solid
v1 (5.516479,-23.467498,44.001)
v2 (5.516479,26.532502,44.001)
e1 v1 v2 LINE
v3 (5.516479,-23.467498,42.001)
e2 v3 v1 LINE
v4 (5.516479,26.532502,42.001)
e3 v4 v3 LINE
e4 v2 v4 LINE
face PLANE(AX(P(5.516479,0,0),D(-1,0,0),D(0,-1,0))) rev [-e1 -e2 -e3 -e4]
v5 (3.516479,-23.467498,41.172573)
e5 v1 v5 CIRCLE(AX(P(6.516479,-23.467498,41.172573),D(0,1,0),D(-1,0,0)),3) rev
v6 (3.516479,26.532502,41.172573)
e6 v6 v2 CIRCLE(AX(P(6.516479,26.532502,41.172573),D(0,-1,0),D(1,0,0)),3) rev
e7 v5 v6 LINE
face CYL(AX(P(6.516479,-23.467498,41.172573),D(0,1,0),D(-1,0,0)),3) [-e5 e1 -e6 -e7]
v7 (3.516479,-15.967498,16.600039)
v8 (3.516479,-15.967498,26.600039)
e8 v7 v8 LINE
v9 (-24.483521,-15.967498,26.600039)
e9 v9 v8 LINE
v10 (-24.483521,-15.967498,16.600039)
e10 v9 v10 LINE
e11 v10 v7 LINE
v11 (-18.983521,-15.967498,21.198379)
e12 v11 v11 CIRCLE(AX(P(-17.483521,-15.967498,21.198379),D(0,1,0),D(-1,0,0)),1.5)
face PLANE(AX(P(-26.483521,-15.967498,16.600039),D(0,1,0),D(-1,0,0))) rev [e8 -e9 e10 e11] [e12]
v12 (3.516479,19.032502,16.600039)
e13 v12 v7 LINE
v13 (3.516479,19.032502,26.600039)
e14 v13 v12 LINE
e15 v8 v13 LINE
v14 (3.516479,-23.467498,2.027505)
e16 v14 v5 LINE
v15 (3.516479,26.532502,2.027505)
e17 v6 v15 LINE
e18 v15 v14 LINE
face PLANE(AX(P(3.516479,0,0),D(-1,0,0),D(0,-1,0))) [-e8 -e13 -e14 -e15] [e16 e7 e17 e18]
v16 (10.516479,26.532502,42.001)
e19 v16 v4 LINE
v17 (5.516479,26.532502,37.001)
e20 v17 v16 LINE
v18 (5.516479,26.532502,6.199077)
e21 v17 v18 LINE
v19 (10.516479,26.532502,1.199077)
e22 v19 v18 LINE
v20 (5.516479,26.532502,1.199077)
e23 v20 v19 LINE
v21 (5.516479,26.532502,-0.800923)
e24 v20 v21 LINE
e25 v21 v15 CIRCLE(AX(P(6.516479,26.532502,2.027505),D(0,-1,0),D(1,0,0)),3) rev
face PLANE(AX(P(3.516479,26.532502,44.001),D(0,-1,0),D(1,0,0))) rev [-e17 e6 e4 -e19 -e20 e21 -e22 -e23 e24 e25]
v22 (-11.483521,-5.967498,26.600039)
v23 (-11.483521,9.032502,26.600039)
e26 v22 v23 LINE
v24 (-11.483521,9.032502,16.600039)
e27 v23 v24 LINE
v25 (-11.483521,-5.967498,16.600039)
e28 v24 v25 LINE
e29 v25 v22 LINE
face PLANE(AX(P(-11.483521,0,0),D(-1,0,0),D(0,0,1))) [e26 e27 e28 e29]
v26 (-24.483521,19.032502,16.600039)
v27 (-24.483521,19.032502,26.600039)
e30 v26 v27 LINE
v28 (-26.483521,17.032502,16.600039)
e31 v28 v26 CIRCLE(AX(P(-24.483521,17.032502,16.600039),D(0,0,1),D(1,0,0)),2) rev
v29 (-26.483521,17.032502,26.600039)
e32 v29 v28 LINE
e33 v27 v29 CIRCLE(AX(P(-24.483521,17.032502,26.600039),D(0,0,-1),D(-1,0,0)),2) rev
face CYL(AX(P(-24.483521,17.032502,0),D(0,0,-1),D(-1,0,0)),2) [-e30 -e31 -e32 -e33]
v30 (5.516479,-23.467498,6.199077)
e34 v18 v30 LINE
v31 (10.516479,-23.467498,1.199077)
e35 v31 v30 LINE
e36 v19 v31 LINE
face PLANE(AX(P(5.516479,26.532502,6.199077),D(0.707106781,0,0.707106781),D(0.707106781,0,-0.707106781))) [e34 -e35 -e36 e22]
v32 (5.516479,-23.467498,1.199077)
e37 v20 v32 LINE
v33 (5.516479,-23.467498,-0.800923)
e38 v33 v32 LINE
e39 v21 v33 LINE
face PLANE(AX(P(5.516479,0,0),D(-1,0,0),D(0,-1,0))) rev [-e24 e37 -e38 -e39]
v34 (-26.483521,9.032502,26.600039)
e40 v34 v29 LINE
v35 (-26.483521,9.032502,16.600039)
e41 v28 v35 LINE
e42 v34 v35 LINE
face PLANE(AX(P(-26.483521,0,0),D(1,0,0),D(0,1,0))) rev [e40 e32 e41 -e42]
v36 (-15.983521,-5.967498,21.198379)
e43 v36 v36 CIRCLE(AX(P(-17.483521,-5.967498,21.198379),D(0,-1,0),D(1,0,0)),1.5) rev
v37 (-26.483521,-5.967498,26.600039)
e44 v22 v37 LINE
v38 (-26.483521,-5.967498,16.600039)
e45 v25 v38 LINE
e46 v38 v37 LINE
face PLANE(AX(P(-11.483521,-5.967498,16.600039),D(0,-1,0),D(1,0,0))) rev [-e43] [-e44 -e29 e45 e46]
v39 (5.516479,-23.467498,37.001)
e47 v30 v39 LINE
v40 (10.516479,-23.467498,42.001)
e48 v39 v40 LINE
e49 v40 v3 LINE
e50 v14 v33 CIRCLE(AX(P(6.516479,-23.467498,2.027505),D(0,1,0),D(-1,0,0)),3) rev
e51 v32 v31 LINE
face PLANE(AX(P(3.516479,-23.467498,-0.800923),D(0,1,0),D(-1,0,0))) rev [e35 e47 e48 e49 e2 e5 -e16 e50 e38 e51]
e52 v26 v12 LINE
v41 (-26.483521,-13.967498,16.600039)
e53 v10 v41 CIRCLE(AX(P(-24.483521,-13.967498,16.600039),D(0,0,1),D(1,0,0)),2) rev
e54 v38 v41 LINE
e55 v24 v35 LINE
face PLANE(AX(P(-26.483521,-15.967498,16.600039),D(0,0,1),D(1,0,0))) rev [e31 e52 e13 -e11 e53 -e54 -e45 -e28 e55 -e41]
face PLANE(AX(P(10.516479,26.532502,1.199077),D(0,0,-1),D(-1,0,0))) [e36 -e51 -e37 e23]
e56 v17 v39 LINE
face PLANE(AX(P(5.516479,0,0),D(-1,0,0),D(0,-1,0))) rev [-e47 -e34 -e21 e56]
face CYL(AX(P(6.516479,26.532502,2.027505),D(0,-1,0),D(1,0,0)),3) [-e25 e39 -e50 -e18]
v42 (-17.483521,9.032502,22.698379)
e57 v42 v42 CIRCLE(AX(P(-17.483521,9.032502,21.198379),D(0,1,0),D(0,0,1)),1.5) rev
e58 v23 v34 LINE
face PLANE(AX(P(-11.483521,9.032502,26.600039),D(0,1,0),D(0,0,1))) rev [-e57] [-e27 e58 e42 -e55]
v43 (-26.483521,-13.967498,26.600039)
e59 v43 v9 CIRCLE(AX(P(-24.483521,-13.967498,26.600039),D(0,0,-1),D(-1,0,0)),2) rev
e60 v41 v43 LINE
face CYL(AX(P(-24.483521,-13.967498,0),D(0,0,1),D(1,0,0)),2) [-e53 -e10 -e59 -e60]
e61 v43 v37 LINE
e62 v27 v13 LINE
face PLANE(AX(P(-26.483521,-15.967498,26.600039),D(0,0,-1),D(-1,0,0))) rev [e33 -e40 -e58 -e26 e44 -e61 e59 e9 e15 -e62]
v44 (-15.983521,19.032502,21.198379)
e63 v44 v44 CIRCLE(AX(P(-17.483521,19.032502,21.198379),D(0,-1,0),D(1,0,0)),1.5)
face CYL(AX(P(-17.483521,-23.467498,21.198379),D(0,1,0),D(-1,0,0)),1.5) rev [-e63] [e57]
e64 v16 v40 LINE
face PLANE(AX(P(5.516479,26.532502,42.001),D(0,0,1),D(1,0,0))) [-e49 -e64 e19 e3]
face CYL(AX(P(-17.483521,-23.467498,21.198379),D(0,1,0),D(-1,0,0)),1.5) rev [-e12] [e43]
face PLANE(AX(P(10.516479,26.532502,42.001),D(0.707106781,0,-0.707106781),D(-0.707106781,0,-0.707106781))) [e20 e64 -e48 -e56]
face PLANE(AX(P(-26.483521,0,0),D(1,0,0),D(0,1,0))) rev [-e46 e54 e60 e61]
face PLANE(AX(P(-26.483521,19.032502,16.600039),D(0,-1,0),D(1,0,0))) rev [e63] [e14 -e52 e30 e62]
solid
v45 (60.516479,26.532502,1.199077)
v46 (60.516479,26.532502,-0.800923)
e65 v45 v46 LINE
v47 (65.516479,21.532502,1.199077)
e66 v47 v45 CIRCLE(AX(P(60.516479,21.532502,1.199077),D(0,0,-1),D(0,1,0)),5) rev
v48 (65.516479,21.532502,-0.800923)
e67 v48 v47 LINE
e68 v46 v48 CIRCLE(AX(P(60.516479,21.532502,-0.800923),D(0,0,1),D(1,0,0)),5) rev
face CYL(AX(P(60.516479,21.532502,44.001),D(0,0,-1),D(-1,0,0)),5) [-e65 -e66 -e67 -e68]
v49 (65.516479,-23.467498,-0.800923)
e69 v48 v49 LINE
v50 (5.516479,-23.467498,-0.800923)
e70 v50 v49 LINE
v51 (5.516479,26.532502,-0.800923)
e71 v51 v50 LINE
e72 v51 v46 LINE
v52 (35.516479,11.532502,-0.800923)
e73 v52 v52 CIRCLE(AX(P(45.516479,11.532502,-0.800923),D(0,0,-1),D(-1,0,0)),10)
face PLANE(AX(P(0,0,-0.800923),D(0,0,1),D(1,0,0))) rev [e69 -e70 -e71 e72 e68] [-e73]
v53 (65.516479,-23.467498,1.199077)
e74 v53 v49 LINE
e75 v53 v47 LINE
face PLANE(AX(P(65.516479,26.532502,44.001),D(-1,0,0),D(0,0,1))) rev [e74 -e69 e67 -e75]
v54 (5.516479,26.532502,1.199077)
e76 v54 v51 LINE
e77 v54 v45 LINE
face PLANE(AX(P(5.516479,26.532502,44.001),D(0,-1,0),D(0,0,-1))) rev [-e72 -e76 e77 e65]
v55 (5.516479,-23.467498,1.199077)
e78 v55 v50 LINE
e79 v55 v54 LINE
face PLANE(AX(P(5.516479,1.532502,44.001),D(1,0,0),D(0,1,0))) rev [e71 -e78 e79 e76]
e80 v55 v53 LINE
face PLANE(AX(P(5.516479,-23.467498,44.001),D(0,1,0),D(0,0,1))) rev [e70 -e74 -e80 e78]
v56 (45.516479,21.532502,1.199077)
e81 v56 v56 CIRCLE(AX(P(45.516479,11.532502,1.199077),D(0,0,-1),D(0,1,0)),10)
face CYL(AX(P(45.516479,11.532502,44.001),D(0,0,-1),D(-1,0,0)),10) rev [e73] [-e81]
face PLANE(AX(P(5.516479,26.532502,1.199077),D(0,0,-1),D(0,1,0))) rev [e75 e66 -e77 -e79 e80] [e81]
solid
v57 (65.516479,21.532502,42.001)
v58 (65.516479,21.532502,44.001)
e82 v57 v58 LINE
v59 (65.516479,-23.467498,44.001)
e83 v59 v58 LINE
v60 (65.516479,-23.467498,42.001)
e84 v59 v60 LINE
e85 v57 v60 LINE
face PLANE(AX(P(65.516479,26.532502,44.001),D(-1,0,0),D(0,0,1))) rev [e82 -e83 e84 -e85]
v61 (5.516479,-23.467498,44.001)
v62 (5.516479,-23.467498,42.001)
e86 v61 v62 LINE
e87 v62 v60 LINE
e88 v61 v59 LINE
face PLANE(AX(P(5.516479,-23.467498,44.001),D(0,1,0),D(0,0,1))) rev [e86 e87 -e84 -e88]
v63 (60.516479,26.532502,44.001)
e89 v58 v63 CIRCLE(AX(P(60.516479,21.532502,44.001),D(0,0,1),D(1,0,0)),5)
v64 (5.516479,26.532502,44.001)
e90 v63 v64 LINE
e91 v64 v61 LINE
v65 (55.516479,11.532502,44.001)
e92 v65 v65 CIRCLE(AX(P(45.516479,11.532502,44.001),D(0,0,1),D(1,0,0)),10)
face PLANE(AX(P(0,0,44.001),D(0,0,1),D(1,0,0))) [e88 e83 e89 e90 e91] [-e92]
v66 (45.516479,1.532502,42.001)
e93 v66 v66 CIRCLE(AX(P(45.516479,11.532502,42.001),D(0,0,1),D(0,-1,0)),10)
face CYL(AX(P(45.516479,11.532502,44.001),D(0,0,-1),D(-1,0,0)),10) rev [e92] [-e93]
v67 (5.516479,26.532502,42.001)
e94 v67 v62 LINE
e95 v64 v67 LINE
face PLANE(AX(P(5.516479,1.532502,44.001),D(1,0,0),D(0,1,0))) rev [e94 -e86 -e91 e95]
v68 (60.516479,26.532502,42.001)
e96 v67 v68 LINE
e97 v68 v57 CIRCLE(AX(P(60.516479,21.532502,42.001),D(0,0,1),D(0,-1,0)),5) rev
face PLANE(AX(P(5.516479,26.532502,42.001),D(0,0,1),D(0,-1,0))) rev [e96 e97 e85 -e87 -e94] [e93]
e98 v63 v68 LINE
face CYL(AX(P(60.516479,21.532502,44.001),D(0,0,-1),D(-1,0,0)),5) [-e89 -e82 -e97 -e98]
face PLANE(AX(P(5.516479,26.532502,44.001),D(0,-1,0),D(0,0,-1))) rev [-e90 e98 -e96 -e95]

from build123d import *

# Parameters (mm, degrees)
SKETCH_3_R               = 3
EXTRUDE_6_DEPTH          = 0.001
EXTRUDE_6_2_DEPTH        = 0.001
EXTRUDE_6_3_DEPTH        = 0.001
EXTRUDE_6_4_DEPTH        = 0.001
CUT_EXTRUDE_2_DEPTH      = 67.213034483
CUT_EXTRUDE_2_DEPTH_BACK = 67.213034483
SKETCH_11_R              = 2.25
EXTRUDE_7_DEPTH          = 2
EXTRUDE_7_DEPTH_BACK     = 0.801922547
SKETCH_14_R              = 10
CUT_EXTRUDE_3_DEPTH      = 3
SKETCH_12_4_R            = 10
EXTRUDE_10_DEPTH         = 44
SKETCH_20_W              = 40.801922547
SKETCH_20_H              = 50
CUT_EXTRUDE_6_DEPTH      = 60
SKETCH_21_W              = 44.801922547
SKETCH_21_H              = 50
EXTRUDE_11_DEPTH         = 2
FILLET_2_R               = 5
FILLET_3_R               = 5
FILLET_5_R               = 3
FILLET_6_R               = 3
EXTRUDE_15_DEPTH         = 50
SKETCH_36_W              = 10
SKETCH_36_H              = 35
EXTRUDE_16_DEPTH         = 30
FILLET_7_R               = 2
CUT_EXTRUDE_8_DEPTH      = 90.636750061
CUT_EXTRUDE_8_DEPTH_BACK = 90.636750061
SKETCH_39_R              = 1.5
SKETCH_38_W              = 10
SKETCH_38_H              = 15
CUT_EXTRUDE_9_DEPTH      = 15


with BuildPart() as part:
    # 草图3 → 凸台-拉伸6 (new body)
    with BuildSketch(Plane.XY):
        with Locations((60.266478541, 16.532501821)):
            Circle(SKETCH_3_R)
    extrude(amount=EXTRUDE_6_DEPTH)


with BuildPart() as body_2:
    # 草图3 → Extrude 6 2 (new body)
    with BuildSketch(Plane.XY):
        with Locations((60.266478541, 6.532501821)):
            Circle(SKETCH_3_R)
    extrude(amount=EXTRUDE_6_2_DEPTH)


with BuildPart() as body_3:
    # 草图3 → Extrude 6 3 (new body)
    with BuildSketch(Plane.XY):
        with Locations((10.766478541, 6.532501821)):
            Circle(SKETCH_3_R)
    extrude(amount=EXTRUDE_6_3_DEPTH)


with BuildPart() as body_4:
    # 草图3 → Extrude 6 4 (new body)
    with BuildSketch(Plane.XY):
        with Locations((10.766478541, 16.532501821)):
            Circle(SKETCH_3_R)
    extrude(amount=EXTRUDE_6_4_DEPTH)


with BuildPart() as cut_extrude_2_tool:
    # 草图11 → 切除-拉伸2 (new, two sides: drawn at the far end of the back side and taken through both)
    with BuildSketch(Plane.XY.offset(0.001).offset(-CUT_EXTRUDE_2_DEPTH_BACK)):
        with Locations((10.766478541, 16.532501821)):
            Circle(SKETCH_11_R)
        with Locations((10.766478541, 6.532501821)):
            Circle(SKETCH_11_R)
        with Locations((60.266478541, 16.532501821)):
            Circle(SKETCH_11_R)
        with Locations((60.266478541, 6.532501821)):
            Circle(SKETCH_11_R)
    extrude(amount=CUT_EXTRUDE_2_DEPTH + CUT_EXTRUDE_2_DEPTH_BACK)


with BuildPart() as part_1:
    add(part.part)

    # 切除-拉伸2: cut by cut_extrude_2_tool
    add(cut_extrude_2_tool.part, mode=Mode.SUBTRACT)



with BuildPart() as body_2_1:
    add(body_2.part)

    # 切除-拉伸2: cut by cut_extrude_2_tool
    add(cut_extrude_2_tool.part, mode=Mode.SUBTRACT)


with BuildPart() as body_3_1:
    add(body_3.part)

    # 切除-拉伸2: cut by cut_extrude_2_tool
    add(cut_extrude_2_tool.part, mode=Mode.SUBTRACT)


with BuildPart() as body_4_1:
    add(body_4.part)

    # 切除-拉伸2: cut by cut_extrude_2_tool
    add(cut_extrude_2_tool.part, mode=Mode.SUBTRACT)


with BuildPart() as body_5:
    # 草图12 → 凸台-拉伸7 (new, two sides: drawn at the far end of the back side and taken through both)
    with BuildSketch(Plane.XY.offset(0.001).offset(-EXTRUDE_7_DEPTH_BACK)):
        Polygon((5.516478541, 26.532501821), (65.516478541, 26.532501821), (65.516478541, -23.467498179), (5.516478541, -23.467498179), (5.516478541, 1.532501821), align=None)
    extrude(amount=EXTRUDE_7_DEPTH + EXTRUDE_7_DEPTH_BACK)

    # 草图14 → 切除-拉伸3 (cut)
    with BuildSketch(Plane(origin=(0, 0, -0.800922547), x_dir=(-1, 0, 0), z_dir=(0, 0, -1))):
        with Locations((-45.516478541, 11.532501821)):
            Circle(SKETCH_14_R)
    extrude(amount=-CUT_EXTRUDE_3_DEPTH, mode=Mode.SUBTRACT)


with BuildPart() as part_2:
    add(part_1.part)

    add(body_2_1.part)  # 凸台-拉伸10 merges body 2

    add(body_3_1.part)  # 凸台-拉伸10 merges body 3

    add(body_4_1.part)  # 凸台-拉伸10 merges body 4

    add(body_5.part)  # 凸台-拉伸10 merges body 5
    # 草图12<4> → 凸台-拉伸10 (add)
    with BuildSketch(Plane.XY.offset(0.001)):
        Polygon((5.516478541, 26.532501821), (65.516478541, 26.532501821), (65.516478541, -23.467498179), (5.516478541, -23.467498179), (5.516478541, 1.532501821), align=None)
        with Locations(Location((45.516478541, 11.532501821, 0), (0, 0, 180))):
            Circle(SKETCH_12_4_R, mode=Mode.SUBTRACT)
    extrude(amount=EXTRUDE_10_DEPTH)

    # 草图20 → 切除-拉伸6 (cut)
    with BuildSketch(Plane(origin=(65.516478541, 0, 0), x_dir=(0, 0, -1), z_dir=(1, 0, 0))):
        with Locations((-21.600038727, 1.532501821)):
            Rectangle(SKETCH_20_W, SKETCH_20_H)
    extrude(amount=-CUT_EXTRUDE_6_DEPTH, mode=Mode.SUBTRACT)


with BuildPart() as cut_extrude_6_piece_1:
    # of the separate pieces the step leaves, piece 1, a body of its own (cut_extrude_6_pieces)
    add(part_2.part.solids().sort_by_distance((5.516478541, 26.532501821, 42.001))[0])

    # 圆角3
    fillet_3_edges = [cut_extrude_6_piece_1.edges().sort_by_distance(p)[0] for p in [
        (65.516478541, 26.532501821, 43.001),
    ]]
    fillet(fillet_3_edges, radius=FILLET_3_R)


with BuildPart() as cut_extrude_6_piece_2:
    # of the separate pieces the step leaves, piece 2, a body of its own (cut_extrude_6_pieces)
    add(part_2.part.solids().sort_by_distance((5.516478541, 26.532501821, -0.800922547))[0])

    # 圆角2
    fillet_2_edges = [cut_extrude_6_piece_2.edges().sort_by_distance(p)[0] for p in [
        (65.516478541, 26.532501821, 0.199077453),
    ]]
    fillet(fillet_2_edges, radius=FILLET_2_R)


with BuildPart() as body_3_2:
    # 草图21 → 凸台-拉伸11 (new body)
    with BuildSketch(Plane.ZY.offset(-5.516478541)):
        with Locations((21.600038727, 1.532501821)):
            Rectangle(SKETCH_21_W, SKETCH_21_H)
    extrude(amount=EXTRUDE_11_DEPTH)

    # 圆角5
    # the kernel refuses this fillet: 3 mm, written as the material it takes off along each edge
    with BuildSketch(Plane(origin=(3.516478541, -30.538565991, 44.001), x_dir=(1, 0, 0), z_dir=(0, 1, 0))) as fillet_5_piece_1:
        with BuildLine():
            CenterArc((3, 2.828427125), FILLET_5_R, 180, 70.528779366)
            Line((0, 2.828427125), (-0.06, 2.828427125))
            Line((-0.06, 2.828427125), (-0.06, 0))
            Line((-0.06, 0), (0, -0.06))
            ThreePointArc((0, -0.06), (1, -0.06), (1.98, -0.056568542))
            Line((1.98, -0.056568542), (2, 0))
        make_face()
    extrude(amount=64.142135624, mode=Mode.SUBTRACT)

    # 圆角6
    # the kernel refuses this fillet: 3 mm, written as the material it takes off along each edge
    with BuildSketch(Plane(origin=(3.516478541, 33.603569633, -0.800922547), x_dir=(0, 0, 1), z_dir=(0, -1, 0))) as fillet_6_piece_1:
        with BuildLine():
            CenterArc((2.828427125, -3), FILLET_6_R, 90, 70.528779366)
            Line((0, -2), (-0.056568542, -1.98))
            ThreePointArc((-0.056568542, -1.98), (-0.06, -1), (-0.06, 0))
            Line((-0.06, 0), (0, 0.06))
            Line((0, 0.06), (2.828427125, 0.06))
            Line((2.828427125, 0.06), (2.828427125, 0))
        make_face()
    extrude(amount=64.142135624, mode=Mode.SUBTRACT)

    # 草图35 → 凸台-拉伸15 (add)
    with BuildSketch(Plane.XZ.offset(23.467498179)):
        Polygon((5.516478541, 42.001), (10.516478541, 42.001), (5.516478541, 37.001), align=None)
        Polygon((5.516478541, 1.199077453), (5.516478541, 6.199077453), (10.516478541, 1.199077453), align=None)
    extrude(amount=-EXTRUDE_15_DEPTH)

    # 草图36 → 凸台-拉伸16 (add)
    with BuildSketch(Plane.ZY.offset(-3.516478541)):
        with Locations((21.600038726, 1.532501821)):
            Rectangle(SKETCH_36_W, SKETCH_36_H)
    extrude(amount=EXTRUDE_16_DEPTH)

    # 圆角7
    fillet_7_edges = [body_3_2.edges().sort_by_distance(p)[0] for p in [
        (-26.483521459, 19.032501821, 21.600038726),
        (-26.483521459, -15.967498179, 21.600038726),
    ]]
    fillet(fillet_7_edges, radius=FILLET_7_R)

    # 草图39 → 切除-拉伸8 (cut, two sides: drawn at the far end of the back side and taken through both)
    with BuildSketch(Plane(origin=(0, 19.032501821, 0), x_dir=(1, 0, 0), z_dir=(0, 1, 0)).offset(-CUT_EXTRUDE_8_DEPTH_BACK)):
        with Locations(Location((-17.483521459, -21.198379325, 0), (0, 0, 180))):
            Circle(SKETCH_39_R)
    extrude(amount=CUT_EXTRUDE_8_DEPTH + CUT_EXTRUDE_8_DEPTH_BACK, mode=Mode.SUBTRACT)

    # 草图38 → 切除-拉伸9 (cut)
    with BuildSketch(Plane.ZY.offset(26.483521459)):
        with Locations((21.600038726, 1.532501821)):
            Rectangle(SKETCH_38_W, SKETCH_38_H)
    extrude(amount=-CUT_EXTRUDE_9_DEPTH, mode=Mode.SUBTRACT)


solid = Compound([cut_extrude_6_piece_1.part, cut_extrude_6_piece_2.part, body_3_2.part])
